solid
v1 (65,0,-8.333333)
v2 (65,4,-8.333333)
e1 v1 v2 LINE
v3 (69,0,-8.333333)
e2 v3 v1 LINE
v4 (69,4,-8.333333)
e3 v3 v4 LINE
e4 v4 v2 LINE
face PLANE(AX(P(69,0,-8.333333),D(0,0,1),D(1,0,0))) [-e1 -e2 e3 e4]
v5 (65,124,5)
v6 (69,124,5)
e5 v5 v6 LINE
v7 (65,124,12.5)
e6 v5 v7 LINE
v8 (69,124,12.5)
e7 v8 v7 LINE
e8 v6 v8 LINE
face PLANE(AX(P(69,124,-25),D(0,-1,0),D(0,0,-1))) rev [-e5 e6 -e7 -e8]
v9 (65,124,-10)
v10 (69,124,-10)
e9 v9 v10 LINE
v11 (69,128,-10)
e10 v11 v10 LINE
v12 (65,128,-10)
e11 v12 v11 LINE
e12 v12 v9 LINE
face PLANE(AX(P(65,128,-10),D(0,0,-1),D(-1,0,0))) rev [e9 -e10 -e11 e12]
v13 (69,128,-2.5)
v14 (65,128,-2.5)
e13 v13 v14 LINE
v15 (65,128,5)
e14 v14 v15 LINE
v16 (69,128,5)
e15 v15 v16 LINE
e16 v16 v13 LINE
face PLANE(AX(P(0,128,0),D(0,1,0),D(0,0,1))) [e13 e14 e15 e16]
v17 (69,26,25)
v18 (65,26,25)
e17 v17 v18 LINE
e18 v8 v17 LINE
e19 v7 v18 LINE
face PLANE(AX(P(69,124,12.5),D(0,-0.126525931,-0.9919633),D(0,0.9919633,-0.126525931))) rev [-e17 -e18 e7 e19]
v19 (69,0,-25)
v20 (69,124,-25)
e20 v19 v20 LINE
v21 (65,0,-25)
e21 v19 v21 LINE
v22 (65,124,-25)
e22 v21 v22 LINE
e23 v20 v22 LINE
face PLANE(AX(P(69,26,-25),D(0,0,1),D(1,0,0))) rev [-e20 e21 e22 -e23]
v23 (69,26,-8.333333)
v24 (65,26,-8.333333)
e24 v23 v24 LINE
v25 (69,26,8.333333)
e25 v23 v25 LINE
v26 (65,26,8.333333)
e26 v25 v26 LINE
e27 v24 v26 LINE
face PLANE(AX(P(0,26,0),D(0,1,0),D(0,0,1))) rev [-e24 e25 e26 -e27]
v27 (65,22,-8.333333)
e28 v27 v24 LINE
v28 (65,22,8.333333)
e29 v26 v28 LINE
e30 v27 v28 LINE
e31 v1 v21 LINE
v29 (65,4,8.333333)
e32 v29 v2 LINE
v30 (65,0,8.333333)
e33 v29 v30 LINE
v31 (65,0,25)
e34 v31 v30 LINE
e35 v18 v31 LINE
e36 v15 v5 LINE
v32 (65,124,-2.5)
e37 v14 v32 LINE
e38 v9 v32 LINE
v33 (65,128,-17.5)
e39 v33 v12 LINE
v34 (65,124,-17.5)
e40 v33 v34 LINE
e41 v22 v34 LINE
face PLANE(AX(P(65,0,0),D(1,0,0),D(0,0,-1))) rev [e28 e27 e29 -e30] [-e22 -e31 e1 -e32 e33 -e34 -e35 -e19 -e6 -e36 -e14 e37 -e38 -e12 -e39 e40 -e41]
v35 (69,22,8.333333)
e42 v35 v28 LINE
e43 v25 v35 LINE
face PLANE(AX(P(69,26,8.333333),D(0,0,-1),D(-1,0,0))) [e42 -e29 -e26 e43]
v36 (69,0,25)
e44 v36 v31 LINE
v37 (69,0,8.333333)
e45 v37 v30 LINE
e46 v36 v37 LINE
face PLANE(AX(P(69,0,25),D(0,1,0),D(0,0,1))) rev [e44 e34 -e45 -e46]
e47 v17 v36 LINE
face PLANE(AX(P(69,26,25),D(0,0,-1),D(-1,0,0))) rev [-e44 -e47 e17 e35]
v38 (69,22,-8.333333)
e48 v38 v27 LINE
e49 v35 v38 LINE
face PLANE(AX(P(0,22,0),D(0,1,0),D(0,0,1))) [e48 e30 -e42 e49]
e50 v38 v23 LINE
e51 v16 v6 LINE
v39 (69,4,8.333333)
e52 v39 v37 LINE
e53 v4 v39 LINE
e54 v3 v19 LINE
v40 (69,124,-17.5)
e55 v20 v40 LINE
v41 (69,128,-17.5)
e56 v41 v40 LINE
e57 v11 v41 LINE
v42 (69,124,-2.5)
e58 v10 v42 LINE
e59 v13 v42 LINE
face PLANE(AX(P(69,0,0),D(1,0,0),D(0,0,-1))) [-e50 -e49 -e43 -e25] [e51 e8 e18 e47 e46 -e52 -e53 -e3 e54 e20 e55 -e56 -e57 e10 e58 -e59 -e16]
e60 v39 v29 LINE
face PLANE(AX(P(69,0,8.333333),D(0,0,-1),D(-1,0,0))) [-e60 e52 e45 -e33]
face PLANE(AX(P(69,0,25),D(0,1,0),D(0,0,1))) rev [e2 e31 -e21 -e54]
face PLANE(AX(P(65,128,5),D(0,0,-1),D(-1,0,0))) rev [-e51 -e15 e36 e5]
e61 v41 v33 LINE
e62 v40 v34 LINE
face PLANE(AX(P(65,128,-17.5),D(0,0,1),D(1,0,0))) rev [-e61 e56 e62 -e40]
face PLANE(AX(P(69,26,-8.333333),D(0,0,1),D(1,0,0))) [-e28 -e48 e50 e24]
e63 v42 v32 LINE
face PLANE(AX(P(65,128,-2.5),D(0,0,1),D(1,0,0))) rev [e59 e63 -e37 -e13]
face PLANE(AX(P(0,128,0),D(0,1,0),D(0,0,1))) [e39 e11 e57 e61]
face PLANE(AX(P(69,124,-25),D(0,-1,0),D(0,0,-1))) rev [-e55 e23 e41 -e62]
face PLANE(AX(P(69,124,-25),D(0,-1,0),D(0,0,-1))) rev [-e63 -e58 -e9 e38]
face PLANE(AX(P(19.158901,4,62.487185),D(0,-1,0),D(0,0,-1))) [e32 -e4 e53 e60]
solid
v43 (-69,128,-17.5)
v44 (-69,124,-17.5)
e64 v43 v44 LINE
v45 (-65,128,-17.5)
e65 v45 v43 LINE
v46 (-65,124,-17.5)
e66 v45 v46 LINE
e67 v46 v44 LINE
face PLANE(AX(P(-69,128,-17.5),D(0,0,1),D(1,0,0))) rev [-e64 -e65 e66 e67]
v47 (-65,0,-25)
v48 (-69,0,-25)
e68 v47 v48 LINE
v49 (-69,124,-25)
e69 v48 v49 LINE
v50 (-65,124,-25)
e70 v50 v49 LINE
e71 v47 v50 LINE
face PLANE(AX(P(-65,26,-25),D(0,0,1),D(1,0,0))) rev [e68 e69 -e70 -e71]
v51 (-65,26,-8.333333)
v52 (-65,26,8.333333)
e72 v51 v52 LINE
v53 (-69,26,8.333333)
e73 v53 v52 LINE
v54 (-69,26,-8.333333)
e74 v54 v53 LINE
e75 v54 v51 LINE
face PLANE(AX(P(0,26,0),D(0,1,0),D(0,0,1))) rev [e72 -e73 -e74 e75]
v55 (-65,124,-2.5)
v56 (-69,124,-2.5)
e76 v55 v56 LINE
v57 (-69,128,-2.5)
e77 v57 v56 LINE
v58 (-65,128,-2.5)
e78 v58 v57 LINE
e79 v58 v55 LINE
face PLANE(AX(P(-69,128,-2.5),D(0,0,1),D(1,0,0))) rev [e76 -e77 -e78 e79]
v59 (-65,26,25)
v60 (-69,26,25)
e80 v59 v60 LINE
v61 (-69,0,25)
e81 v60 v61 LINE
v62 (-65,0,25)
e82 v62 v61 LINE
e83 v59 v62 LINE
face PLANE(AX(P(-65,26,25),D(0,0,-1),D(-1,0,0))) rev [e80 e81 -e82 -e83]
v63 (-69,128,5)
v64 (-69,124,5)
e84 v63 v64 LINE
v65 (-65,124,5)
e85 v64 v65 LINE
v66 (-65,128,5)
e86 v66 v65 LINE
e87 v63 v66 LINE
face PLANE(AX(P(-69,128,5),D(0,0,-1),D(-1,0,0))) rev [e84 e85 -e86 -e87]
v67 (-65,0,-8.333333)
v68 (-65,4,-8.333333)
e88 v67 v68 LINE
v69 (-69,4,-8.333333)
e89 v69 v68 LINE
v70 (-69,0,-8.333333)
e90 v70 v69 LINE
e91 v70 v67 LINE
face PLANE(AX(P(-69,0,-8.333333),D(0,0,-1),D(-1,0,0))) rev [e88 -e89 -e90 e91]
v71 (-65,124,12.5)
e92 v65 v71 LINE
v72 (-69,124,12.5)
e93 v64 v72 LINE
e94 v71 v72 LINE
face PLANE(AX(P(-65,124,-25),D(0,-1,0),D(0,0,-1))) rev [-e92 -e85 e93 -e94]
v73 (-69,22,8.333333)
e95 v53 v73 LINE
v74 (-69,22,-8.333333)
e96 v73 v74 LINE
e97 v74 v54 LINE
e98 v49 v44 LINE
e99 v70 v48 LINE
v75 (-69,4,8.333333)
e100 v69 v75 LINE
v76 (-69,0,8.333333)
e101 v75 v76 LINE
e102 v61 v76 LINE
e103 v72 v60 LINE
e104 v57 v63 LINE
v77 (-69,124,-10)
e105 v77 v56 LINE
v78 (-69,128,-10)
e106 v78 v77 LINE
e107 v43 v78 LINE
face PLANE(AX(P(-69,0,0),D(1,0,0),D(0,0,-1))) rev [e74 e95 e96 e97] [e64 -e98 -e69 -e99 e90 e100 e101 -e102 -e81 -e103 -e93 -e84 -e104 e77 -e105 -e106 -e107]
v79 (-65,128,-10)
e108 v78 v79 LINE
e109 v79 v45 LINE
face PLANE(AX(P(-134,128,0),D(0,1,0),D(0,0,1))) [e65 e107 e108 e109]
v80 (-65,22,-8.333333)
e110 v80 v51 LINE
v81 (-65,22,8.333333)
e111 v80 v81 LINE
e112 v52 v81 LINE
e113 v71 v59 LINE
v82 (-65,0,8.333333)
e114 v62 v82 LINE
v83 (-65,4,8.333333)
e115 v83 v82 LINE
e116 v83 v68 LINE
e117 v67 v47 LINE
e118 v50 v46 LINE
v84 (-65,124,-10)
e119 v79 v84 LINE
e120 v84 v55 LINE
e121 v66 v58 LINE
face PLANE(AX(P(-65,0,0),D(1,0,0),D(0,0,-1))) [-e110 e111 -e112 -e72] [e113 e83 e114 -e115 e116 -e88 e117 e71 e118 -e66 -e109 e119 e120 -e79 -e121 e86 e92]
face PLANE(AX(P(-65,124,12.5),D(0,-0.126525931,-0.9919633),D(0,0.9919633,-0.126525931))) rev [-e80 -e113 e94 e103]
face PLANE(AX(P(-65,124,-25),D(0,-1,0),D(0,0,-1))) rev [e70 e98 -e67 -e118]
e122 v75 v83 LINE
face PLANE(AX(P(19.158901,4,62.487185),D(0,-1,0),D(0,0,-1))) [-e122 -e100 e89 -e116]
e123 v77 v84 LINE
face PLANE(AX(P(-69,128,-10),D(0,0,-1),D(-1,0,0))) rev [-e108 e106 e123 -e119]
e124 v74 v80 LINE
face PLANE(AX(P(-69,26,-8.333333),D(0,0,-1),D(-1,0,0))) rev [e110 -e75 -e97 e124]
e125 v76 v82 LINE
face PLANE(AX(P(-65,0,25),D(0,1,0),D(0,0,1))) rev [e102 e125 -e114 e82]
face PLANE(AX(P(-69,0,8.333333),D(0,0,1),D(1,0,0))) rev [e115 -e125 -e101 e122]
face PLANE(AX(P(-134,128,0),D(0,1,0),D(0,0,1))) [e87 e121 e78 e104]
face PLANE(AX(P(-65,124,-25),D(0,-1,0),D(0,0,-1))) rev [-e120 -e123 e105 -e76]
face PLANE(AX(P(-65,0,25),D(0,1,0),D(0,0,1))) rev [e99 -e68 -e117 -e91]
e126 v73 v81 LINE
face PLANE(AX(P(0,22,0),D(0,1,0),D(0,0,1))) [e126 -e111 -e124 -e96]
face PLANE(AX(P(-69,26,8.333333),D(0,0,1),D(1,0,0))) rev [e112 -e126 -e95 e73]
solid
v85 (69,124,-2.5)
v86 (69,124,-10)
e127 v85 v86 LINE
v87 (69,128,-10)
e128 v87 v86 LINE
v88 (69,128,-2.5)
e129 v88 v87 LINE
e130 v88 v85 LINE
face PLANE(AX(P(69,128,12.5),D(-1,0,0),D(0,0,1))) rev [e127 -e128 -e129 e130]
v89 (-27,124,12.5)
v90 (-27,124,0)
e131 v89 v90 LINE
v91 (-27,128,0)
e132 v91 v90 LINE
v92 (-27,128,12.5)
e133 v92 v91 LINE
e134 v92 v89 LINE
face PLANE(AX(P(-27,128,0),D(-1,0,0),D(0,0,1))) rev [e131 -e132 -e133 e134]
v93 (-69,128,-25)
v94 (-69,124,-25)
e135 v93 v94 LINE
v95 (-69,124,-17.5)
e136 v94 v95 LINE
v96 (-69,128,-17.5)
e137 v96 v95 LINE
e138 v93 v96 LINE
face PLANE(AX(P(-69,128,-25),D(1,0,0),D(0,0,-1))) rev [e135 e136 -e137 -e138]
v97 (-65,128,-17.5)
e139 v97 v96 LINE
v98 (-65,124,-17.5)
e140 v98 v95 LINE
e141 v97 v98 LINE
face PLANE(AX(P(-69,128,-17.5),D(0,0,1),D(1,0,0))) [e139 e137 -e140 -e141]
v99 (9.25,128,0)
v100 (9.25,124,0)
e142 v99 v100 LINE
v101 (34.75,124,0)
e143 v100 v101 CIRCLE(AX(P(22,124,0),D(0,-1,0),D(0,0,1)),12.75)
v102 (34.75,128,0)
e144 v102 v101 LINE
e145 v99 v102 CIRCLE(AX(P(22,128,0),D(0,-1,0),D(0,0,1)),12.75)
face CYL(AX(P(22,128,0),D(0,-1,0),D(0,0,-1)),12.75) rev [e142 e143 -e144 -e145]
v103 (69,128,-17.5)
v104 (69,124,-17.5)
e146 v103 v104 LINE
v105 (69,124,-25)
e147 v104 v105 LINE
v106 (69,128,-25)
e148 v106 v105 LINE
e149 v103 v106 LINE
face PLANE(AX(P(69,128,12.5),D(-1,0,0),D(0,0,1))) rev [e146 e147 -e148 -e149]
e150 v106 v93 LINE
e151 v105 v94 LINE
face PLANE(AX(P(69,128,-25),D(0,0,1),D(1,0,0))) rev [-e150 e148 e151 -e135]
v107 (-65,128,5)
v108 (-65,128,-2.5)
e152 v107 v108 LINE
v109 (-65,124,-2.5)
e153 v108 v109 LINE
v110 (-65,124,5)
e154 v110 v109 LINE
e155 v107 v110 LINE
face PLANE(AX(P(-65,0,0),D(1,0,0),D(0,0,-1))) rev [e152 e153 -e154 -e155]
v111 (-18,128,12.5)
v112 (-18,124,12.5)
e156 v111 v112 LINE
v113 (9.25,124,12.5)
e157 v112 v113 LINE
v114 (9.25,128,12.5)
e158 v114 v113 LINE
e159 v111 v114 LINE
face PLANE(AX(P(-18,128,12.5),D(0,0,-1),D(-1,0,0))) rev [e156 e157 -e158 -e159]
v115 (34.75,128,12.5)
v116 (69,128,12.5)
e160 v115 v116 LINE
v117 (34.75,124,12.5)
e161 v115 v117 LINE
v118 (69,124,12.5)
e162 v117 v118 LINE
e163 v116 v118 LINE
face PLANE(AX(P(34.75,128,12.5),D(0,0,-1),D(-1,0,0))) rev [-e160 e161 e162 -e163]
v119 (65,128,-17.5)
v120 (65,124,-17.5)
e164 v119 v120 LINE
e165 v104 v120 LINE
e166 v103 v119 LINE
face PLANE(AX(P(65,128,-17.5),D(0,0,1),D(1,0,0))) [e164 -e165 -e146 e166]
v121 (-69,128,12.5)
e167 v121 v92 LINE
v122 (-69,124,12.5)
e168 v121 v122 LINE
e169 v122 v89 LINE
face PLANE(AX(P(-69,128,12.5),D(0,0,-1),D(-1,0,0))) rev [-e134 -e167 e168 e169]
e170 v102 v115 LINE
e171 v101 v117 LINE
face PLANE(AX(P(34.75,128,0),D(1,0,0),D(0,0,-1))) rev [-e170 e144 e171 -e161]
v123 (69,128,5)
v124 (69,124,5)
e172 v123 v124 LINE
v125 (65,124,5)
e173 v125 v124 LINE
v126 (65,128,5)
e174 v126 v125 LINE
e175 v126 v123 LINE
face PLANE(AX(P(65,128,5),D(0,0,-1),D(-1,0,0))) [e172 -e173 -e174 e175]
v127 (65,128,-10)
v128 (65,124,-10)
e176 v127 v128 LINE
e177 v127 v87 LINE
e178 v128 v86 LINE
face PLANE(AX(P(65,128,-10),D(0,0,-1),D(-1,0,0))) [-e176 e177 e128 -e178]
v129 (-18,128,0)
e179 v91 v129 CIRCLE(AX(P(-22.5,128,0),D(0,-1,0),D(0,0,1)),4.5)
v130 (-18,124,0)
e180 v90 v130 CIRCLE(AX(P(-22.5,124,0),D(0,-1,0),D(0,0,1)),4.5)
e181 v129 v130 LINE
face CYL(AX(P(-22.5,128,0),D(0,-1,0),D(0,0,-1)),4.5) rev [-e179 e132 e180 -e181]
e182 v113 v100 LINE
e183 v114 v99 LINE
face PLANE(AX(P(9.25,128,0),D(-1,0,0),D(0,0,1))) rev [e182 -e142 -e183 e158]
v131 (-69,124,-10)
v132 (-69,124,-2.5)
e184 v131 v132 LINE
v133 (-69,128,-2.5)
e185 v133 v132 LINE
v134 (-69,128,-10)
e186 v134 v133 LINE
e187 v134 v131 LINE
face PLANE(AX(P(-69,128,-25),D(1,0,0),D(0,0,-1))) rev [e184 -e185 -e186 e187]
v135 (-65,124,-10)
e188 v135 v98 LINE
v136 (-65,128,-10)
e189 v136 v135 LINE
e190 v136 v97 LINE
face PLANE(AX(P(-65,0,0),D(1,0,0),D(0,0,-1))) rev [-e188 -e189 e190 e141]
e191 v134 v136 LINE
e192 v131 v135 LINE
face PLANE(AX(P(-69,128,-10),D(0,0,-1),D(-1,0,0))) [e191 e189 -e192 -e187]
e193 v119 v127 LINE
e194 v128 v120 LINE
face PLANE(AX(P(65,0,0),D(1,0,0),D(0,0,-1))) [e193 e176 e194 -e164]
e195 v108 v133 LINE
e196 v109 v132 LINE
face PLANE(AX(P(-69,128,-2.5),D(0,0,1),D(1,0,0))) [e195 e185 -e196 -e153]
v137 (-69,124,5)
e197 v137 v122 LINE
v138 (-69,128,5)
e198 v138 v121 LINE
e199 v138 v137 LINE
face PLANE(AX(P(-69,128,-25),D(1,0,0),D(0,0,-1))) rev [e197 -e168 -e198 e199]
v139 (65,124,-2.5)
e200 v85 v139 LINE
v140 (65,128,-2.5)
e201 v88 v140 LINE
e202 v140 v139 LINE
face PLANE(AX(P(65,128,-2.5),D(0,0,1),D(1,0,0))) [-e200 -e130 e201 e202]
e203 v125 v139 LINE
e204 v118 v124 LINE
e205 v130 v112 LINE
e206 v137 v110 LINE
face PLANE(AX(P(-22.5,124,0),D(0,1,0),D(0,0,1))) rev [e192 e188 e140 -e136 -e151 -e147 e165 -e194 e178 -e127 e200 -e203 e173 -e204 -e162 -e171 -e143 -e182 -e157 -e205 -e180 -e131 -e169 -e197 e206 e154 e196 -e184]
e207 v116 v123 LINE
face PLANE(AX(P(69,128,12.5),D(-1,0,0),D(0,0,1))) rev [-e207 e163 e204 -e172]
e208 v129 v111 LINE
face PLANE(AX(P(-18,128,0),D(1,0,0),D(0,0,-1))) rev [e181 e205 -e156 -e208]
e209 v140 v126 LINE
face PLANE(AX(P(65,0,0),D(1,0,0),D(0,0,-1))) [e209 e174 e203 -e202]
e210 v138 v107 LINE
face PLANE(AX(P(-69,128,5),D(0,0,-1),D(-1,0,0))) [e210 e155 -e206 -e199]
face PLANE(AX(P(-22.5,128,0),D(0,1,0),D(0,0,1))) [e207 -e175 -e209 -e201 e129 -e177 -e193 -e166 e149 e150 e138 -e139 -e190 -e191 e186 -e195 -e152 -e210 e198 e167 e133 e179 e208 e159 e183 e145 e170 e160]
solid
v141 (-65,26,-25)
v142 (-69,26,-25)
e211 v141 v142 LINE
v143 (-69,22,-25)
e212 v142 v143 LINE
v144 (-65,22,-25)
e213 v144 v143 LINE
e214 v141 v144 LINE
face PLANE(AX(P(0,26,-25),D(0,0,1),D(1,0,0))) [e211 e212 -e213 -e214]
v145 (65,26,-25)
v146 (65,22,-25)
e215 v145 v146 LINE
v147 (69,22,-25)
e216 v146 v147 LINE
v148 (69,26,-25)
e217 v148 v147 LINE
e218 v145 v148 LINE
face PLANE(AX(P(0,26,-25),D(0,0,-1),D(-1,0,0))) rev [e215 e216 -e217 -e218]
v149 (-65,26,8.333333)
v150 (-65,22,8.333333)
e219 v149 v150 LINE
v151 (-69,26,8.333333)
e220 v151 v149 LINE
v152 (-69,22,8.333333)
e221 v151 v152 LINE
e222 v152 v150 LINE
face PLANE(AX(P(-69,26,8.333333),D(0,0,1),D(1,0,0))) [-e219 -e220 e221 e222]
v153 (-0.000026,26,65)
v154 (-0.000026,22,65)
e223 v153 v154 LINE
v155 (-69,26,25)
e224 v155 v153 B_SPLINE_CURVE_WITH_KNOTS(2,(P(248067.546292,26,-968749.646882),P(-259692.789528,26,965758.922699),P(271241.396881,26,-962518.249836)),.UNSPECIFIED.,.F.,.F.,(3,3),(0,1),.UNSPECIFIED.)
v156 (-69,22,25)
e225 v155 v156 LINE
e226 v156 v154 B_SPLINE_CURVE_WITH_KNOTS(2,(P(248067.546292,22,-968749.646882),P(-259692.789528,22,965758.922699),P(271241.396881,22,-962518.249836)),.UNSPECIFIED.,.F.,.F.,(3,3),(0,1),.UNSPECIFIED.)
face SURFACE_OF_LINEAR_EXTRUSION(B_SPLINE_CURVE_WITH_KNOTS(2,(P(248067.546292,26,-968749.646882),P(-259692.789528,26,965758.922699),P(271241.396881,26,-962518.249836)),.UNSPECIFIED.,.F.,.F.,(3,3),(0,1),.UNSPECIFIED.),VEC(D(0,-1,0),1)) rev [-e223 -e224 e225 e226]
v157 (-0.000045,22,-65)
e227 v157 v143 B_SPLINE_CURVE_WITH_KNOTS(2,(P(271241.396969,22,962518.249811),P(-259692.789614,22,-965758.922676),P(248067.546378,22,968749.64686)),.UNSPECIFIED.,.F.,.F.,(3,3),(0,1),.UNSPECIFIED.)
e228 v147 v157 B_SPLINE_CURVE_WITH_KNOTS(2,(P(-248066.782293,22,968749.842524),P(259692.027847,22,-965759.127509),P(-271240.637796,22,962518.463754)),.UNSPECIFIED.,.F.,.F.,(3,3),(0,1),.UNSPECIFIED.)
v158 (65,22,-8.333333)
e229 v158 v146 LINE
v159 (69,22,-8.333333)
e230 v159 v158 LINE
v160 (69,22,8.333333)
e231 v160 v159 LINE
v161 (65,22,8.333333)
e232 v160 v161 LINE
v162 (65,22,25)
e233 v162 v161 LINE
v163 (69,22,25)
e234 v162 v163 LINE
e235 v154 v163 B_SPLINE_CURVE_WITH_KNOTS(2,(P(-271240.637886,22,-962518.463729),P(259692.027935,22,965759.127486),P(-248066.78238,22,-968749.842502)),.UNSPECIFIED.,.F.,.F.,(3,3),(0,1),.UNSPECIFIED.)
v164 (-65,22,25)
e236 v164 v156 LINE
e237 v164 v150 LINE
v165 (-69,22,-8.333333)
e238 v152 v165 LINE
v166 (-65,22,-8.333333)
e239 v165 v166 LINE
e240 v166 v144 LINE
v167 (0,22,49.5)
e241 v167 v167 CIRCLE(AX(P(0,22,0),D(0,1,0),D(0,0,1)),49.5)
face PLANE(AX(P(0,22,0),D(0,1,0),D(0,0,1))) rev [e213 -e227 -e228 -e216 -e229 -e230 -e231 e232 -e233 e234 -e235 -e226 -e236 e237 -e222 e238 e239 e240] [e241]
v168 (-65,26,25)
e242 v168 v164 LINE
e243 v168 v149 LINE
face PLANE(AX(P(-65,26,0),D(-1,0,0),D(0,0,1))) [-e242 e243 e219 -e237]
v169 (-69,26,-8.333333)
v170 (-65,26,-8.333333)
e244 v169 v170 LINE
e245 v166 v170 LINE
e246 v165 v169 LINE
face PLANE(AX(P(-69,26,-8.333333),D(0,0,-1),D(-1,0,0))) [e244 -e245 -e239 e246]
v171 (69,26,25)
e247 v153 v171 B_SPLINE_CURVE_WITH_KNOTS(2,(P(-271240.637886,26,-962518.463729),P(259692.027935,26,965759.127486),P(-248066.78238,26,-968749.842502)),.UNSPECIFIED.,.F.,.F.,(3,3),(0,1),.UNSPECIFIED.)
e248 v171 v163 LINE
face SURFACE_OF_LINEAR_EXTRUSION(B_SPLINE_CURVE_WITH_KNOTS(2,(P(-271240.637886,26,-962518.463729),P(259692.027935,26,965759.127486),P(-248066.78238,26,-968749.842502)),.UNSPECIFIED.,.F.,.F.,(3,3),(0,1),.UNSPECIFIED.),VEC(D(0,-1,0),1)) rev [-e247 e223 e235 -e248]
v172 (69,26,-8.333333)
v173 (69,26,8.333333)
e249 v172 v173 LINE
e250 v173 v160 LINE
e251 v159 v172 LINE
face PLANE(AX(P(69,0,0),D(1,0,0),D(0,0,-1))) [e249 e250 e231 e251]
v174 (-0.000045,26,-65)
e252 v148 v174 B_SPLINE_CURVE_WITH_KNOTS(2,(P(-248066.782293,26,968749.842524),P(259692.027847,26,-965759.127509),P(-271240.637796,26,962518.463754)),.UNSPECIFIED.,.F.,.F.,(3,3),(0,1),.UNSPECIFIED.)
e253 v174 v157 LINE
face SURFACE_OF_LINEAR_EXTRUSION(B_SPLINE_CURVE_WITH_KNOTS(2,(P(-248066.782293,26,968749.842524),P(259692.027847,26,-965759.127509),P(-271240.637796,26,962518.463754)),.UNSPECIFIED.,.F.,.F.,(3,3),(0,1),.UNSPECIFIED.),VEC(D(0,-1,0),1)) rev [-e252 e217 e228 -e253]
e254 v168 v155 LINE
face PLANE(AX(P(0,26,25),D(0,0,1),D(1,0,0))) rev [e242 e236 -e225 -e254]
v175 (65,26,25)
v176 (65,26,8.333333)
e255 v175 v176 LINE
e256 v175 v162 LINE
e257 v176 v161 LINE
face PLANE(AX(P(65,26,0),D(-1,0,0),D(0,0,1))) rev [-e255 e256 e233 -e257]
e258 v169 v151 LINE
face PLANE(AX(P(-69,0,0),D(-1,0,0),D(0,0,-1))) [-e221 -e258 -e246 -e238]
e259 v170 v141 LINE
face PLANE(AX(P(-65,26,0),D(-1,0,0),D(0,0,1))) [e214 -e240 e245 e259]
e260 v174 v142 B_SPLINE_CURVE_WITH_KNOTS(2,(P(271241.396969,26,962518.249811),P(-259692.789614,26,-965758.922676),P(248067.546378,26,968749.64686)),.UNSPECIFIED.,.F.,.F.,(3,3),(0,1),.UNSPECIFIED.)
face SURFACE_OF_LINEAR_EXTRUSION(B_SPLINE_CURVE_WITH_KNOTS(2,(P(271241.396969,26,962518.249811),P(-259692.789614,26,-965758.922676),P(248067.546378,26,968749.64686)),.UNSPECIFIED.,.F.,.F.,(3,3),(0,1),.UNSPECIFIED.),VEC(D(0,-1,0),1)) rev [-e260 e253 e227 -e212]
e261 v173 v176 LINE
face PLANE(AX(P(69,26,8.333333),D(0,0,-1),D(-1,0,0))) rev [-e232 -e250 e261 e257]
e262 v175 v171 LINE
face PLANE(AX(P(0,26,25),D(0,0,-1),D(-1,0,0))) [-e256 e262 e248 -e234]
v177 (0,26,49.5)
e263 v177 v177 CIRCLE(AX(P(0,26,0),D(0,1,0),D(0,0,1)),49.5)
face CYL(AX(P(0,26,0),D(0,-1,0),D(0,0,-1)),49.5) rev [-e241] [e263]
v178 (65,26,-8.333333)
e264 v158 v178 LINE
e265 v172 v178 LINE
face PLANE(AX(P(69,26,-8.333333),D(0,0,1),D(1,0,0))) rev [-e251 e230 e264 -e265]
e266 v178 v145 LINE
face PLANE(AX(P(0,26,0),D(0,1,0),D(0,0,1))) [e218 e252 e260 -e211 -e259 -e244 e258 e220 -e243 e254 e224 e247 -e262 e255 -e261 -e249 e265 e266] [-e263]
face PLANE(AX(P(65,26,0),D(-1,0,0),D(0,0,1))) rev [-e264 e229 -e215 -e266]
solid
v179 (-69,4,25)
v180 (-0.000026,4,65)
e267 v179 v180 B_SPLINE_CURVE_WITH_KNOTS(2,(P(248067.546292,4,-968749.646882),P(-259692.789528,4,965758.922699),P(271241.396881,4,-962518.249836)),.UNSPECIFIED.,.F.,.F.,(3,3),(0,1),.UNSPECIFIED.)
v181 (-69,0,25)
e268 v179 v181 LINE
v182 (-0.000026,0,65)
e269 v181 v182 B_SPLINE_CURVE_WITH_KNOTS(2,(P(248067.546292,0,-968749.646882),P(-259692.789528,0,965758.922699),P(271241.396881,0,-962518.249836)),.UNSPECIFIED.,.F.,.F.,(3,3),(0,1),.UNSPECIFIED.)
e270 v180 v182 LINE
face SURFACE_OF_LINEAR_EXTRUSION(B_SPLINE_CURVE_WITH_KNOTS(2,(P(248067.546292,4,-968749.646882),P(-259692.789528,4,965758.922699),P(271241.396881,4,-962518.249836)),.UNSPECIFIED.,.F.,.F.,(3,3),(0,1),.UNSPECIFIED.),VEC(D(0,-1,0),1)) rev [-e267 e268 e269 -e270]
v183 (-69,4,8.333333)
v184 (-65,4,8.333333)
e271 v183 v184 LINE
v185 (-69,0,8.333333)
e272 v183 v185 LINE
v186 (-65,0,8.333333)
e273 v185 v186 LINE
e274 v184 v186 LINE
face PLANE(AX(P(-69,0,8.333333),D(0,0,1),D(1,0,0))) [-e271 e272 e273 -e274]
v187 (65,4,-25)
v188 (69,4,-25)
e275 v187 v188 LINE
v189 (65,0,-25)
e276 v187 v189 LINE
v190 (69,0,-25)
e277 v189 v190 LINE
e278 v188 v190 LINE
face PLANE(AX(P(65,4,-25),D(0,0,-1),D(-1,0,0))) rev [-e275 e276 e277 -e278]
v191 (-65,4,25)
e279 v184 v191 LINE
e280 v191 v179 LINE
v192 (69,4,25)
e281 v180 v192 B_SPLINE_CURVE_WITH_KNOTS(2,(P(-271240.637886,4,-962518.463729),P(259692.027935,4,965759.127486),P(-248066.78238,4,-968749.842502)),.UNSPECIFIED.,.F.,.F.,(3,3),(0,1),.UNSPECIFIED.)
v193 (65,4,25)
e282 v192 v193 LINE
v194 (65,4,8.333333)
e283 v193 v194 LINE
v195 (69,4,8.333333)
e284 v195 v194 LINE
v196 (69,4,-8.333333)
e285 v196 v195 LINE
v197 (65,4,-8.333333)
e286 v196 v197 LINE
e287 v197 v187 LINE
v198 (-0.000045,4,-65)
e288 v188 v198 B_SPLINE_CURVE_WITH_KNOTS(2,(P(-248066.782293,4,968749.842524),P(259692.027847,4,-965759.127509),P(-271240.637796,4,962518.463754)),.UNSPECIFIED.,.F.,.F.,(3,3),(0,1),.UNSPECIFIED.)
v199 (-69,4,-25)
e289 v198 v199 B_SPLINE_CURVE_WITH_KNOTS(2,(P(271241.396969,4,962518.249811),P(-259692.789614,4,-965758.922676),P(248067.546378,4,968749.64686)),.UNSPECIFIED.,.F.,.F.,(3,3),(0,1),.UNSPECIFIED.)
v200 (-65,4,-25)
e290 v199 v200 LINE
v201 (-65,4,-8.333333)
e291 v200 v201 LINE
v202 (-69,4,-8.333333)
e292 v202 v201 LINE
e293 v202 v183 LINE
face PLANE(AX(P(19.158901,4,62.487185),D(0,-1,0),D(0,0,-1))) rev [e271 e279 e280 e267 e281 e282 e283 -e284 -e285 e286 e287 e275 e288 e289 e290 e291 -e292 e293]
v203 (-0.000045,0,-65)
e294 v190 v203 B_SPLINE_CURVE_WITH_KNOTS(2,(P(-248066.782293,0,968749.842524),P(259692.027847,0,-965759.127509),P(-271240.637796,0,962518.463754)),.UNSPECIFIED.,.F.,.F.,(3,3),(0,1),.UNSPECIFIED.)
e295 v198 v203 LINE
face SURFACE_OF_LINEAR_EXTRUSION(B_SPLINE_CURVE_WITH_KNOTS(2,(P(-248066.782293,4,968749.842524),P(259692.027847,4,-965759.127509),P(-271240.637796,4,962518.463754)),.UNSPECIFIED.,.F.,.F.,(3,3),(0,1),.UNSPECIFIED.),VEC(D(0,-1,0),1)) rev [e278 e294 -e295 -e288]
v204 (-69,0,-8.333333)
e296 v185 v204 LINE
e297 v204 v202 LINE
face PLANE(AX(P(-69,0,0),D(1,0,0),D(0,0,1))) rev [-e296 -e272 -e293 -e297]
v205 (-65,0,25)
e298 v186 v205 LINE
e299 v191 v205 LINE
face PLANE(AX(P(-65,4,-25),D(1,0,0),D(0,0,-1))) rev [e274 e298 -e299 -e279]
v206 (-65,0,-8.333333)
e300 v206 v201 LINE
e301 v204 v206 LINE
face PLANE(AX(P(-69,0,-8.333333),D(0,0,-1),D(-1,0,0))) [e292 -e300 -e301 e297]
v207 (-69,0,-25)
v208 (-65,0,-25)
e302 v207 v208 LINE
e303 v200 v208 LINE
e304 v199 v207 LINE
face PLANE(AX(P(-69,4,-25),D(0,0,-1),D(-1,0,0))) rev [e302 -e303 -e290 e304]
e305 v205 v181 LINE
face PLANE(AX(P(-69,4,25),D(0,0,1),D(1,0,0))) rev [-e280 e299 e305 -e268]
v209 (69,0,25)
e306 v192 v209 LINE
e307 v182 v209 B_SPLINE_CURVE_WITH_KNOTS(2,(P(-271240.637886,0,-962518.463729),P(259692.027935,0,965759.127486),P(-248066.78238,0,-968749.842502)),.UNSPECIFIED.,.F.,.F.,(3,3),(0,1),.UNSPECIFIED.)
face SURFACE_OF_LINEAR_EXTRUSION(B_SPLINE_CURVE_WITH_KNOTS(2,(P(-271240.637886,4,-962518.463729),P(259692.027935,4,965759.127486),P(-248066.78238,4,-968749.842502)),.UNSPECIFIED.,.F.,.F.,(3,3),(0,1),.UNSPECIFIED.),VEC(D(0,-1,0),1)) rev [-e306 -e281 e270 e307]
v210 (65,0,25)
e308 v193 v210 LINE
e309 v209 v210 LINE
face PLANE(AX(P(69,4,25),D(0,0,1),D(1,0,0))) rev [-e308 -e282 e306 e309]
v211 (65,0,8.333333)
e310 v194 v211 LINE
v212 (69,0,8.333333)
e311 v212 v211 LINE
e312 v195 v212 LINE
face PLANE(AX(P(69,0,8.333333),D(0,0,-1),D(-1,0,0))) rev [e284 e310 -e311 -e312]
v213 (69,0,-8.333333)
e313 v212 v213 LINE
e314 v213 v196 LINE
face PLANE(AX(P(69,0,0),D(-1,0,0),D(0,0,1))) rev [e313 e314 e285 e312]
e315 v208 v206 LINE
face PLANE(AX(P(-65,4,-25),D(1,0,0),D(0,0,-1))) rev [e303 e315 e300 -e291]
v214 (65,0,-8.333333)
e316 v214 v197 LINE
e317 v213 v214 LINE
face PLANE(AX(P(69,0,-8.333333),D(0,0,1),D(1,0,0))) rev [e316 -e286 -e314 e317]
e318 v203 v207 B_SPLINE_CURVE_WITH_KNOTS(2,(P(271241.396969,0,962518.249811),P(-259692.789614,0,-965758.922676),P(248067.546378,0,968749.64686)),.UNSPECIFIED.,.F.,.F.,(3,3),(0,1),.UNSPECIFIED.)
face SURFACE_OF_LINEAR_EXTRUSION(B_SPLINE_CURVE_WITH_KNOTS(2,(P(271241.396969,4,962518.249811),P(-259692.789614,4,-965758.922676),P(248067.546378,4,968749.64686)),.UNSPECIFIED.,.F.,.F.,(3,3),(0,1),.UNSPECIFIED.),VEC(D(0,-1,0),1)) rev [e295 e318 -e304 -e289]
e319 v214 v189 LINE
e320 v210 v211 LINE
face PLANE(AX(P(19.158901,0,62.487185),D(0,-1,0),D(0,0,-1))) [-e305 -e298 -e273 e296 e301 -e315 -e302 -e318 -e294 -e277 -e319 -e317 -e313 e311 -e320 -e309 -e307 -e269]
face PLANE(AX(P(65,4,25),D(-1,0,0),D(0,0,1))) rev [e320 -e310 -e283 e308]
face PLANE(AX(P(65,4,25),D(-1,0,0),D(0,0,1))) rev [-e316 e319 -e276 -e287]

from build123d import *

# Parameters (mm, degrees)
BOSS_EXTRUDE1_DEPTH = 4
SKETCH2_W           = 16.666666666
SKETCH2_H           = 4
BOSS_EXTRUDE2_DEPTH = 4
SKETCH4_R           = 49.5
BOSS_EXTRUDE3_DEPTH = 4
SKETCH5_W           = 16.666666666
SKETCH5_H           = 4
BOSS_EXTRUDE4_DEPTH = 4
BOSS_EXTRUDE5_DEPTH = 4
INDENT3_OUTLINE_W   = 4
INDENT3_OUTLINE_H   = 16.666666666
INDENT3_DEPTH       = 4
INDENT3_START       = 22
INDENT3_2_OUTLINE_W = 4
INDENT3_2_OUTLINE_H = 16.666666666
INDENT3_2_DEPTH     = 4
LPATTERN1_COUNT     = 2
LPATTERN1_PITCH     = 134
INDENT5_OUTLINE_W   = 4
INDENT5_OUTLINE_H   = 16.666666666
INDENT5_DEPTH       = 4
INDENT5_START       = 22
INDENT5_2_OUTLINE_W = 4
INDENT5_2_OUTLINE_H = 16.666666666
INDENT5_2_DEPTH     = 4
SKETCH8_W           = 4
SKETCH8_H           = 7.5
BOSS_EXTRUDE6_DEPTH = 4
LPATTERN3_COUNT     = 2
LPATTERN3_PITCH     = 134
BOSS_EXTRUDE7_DEPTH = 4
INDENT6_START       = -17.5
INDENT6_OUTLINE_W   = 4
INDENT6_OUTLINE_H   = 4
INDENT6_DEPTH       = 7.5
INDENT6_START_2     = -2.5
INDENT6_2_OUTLINE_W = 4
INDENT6_2_OUTLINE_H = 4
INDENT6_2_DEPTH     = 7.5


# Read off the part's stored shape, not the designer's step: Indent3, Indent5, Indent6
with BuildPart() as part:
    # Sketch1 → Boss-Extrude1 (new body)
    with BuildSketch(Plane(origin=(0, 0, 0), x_dir=(1, 0, 0), z_dir=(0, 1, 0))):
        with BuildLine():
            Line((-65, 25), (-65, -25))
            Line((-65, -25), (-69, -25))
            add(Edge.make_bspline(
                [(-69, -25), (-39.849959526, -64.895836828), (-2.6224e-05, -65)],
                knots=[0, 0, 0, 1, 1, 1], degree=2))
            add(Edge.make_bspline(
                [(-2.6224e-05, -65), (39.849922378, -64.895858771), (69, -25)],
                knots=[0, 0, 0, 1, 1, 1], degree=2))
            Line((69, -25), (65, -25))
            Line((65, -25), (65, 25))
            Line((65, 25), (69, 25))
            add(Edge.make_bspline(
                [(69, 25), (39.849915495, 64.895868161), (-4.5036e-05, 65)],
                knots=[0, 0, 0, 1, 1, 1], degree=2))
            add(Edge.make_bspline(
                [(-4.5036e-05, 65), (-39.849966409, 64.895827437), (-69, 25)],
                knots=[0, 0, 0, 1, 1, 1], degree=2))
            Line((-69, 25), (-65, 25))
        make_face()
    extrude(amount=BOSS_EXTRUDE1_DEPTH)

    # Sketch2 → Boss-Extrude2 (add)
    with BuildSketch(Plane(origin=(65, 0, 0), x_dir=(0, 0, -1), z_dir=(1, 0, 0))):
        with Locations((0, 2)):
            Rectangle(SKETCH2_W, SKETCH2_H)
    boss_extrude2 = extrude(amount=BOSS_EXTRUDE2_DEPTH)

    # Mirror1: Boss-Extrude2 across plane
    add(boss_extrude2.mirror(Plane(origin=(0, 0, 0), x_dir=(0, 0, 1), z_dir=(1, 0, 0))))


with BuildPart() as body_2:
    # Sketch4 → Boss-Extrude3 (new body)
    with BuildSketch(Plane(origin=(0, 22, 0), x_dir=(1, 0, 0), z_dir=(0, 1, 0))):
        with BuildLine():
            add(Edge.make_bspline(
                [(-69, -25), (-39.849959526, -64.895836827), (-2.6225e-05, -65)],
                knots=[0, 0, 0, 1, 1, 1], degree=2))
            add(Edge.make_bspline(
                [(-2.6225e-05, -65), (39.849922378, -64.895858771), (69, -25)],
                knots=[0, 0, 0, 1, 1, 1], degree=2))
            Line((69, -25), (65, -25))
            Line((65, -25), (65, 25))
            Line((65, 25), (69, 25))
            add(Edge.make_bspline(
                [(69, 25), (39.849915496, 64.895868161), (-4.5035e-05, 65)],
                knots=[0, 0, 0, 1, 1, 1], degree=2))
            add(Edge.make_bspline(
                [(-4.5035e-05, 65), (-39.849966364, 64.895827438), (-68.999999935, 25.000000088)],
                knots=[0, 0, 0, 1, 1, 1], degree=2))
            Line((-68.999999935, 25.000000088), (-65, 25))
            Line((-65, 25), (-65, -25))
            Line((-65, -25), (-69, -25))
        make_face()
        with Locations(Location((0, 0, 0), (0, 0, 270))):
            Circle(SKETCH4_R, mode=Mode.SUBTRACT)
    extrude(amount=BOSS_EXTRUDE3_DEPTH)

    # Sketch5 → Boss-Extrude4 (add)
    with BuildSketch(Plane(origin=(65, 0, 0), x_dir=(0, 0, -1), z_dir=(1, 0, 0))):
        with Locations((0, 24)):
            Rectangle(SKETCH5_W, SKETCH5_H)
    boss_extrude4 = extrude(amount=BOSS_EXTRUDE4_DEPTH)

    # Mirror2: Boss-Extrude4 across plane
    add(boss_extrude4.mirror(Plane(origin=(0, 0, 0), x_dir=(0, 0, 1), z_dir=(1, 0, 0))))


with BuildPart() as body_3:
    # Sketch6 → Boss-Extrude5 (new body)
    with BuildSketch(Plane(origin=(65, 0, 0), x_dir=(0, 0, -1), z_dir=(1, 0, 0))):
        Polygon((25, 26), (25, 124), (-12.5, 124), (-25, 26), (-25, 0), (25, 0), align=None)
    boss_extrude5 = extrude(amount=BOSS_EXTRUDE5_DEPTH)

    # Indent3 outline → Indent3 (cut)
    with BuildSketch(Plane(origin=(0, 0, 0), x_dir=(1, 0, 0), z_dir=(0, 1, 0))):
        with Locations((67, 0)):
            Rectangle(INDENT3_OUTLINE_W, INDENT3_OUTLINE_H)
    extrude(amount=INDENT3_DEPTH, mode=Mode.SUBTRACT)

    # Indent3 2 outline → Indent3 2 (cut)
    with BuildSketch(Plane(origin=(0, 0, 0), x_dir=(1, 0, 0), z_dir=(0, 1, 0)).offset(INDENT3_START)):
        with Locations((67, 0)):
            Rectangle(INDENT3_2_OUTLINE_W, INDENT3_2_OUTLINE_H)
    extrude(amount=INDENT3_2_DEPTH, mode=Mode.SUBTRACT)

    # Sketch8 → Boss-Extrude6 (add)
    with BuildSketch(Plane(origin=(0, 124, 0), x_dir=(1, 0, 0), z_dir=(0, 1, 0))):
        with Locations((67, 13.75)):
            Rectangle(SKETCH8_W, SKETCH8_H)
        with Locations((67, -1.25)):
            Rectangle(SKETCH8_W, SKETCH8_H)
    boss_extrude6 = extrude(amount=BOSS_EXTRUDE6_DEPTH)


with BuildPart() as lpattern1_1:
    # LPattern1: Boss-Extrude5 ×2
    with Locations(*[(-i * LPATTERN1_PITCH, 0, 0) for i in range(1, LPATTERN1_COUNT)]):
        add(boss_extrude5)

    # Indent5 outline → Indent5 (cut)
    with BuildSketch(Plane(origin=(0, 0, 0), x_dir=(1, 0, 0), z_dir=(0, 1, 0))):
        with Locations((-67, 0)):
            Rectangle(INDENT5_OUTLINE_W, INDENT5_OUTLINE_H)
    extrude(amount=INDENT5_DEPTH, mode=Mode.SUBTRACT)

    # Indent5 2 outline → Indent5 2 (cut)
    with BuildSketch(Plane(origin=(0, 0, 0), x_dir=(1, 0, 0), z_dir=(0, 1, 0)).offset(INDENT5_START)):
        with Locations((-67, 0)):
            Rectangle(INDENT5_2_OUTLINE_W, INDENT5_2_OUTLINE_H)
    extrude(amount=INDENT5_2_DEPTH, mode=Mode.SUBTRACT)

    # LPattern3: Boss-Extrude6 ×2
    with Locations(*[(-i * LPATTERN3_PITCH, 0, 0) for i in range(1, LPATTERN3_COUNT)]):
        add(boss_extrude6)


with BuildPart() as body_5:
    # Sketch9 → Boss-Extrude7 (new body)
    with BuildSketch(Plane(origin=(0, 124, 0), x_dir=(1, 0, 0), z_dir=(0, 1, 0))):
        with BuildLine():
            Line((-69, -12.5), (-27, -12.5))
            Line((-27, -12.5), (-27, 0))
            ThreePointArc((-27, 0), (-22.5, 4.5), (-18, 0))
            Line((-18, 0), (-18, -12.5))
            Line((-18, -12.5), (9.25, -12.5))
            Line((9.25, -12.5), (9.25, 0))
            ThreePointArc((9.25, 0), (22, 12.75), (34.75, 0))
            Line((34.75, 0), (34.75, -12.5))
            Line((34.75, -12.5), (69, -12.5))
            Line((69, -12.5), (69, 25))
            Line((69, 25), (-69, 25))
            Line((-69, 25), (-69, -12.5))
        make_face()
    extrude(amount=BOSS_EXTRUDE7_DEPTH)

    # Indent6 outline → Indent6 (cut)
    with BuildSketch(Plane.XY.offset(INDENT6_START)):
        with Locations((67, 126)):
            Rectangle(INDENT6_OUTLINE_W, INDENT6_OUTLINE_H)
        with Locations((-67, 126)):
            Rectangle(INDENT6_OUTLINE_W, INDENT6_OUTLINE_H)
    extrude(amount=INDENT6_DEPTH, mode=Mode.SUBTRACT)

    # Indent6 2 outline → Indent6 2 (cut)
    with BuildSketch(Plane.XY.offset(INDENT6_START_2)):
        with Locations((67, 126)):
            Rectangle(INDENT6_2_OUTLINE_W, INDENT6_2_OUTLINE_H)
        with Locations((-67, 126)):
            Rectangle(INDENT6_2_OUTLINE_W, INDENT6_2_OUTLINE_H)
    extrude(amount=INDENT6_2_DEPTH, mode=Mode.SUBTRACT)


solid = Compound([part.part, body_2.part, body_3.part, lpattern1_1.part, body_5.part])
